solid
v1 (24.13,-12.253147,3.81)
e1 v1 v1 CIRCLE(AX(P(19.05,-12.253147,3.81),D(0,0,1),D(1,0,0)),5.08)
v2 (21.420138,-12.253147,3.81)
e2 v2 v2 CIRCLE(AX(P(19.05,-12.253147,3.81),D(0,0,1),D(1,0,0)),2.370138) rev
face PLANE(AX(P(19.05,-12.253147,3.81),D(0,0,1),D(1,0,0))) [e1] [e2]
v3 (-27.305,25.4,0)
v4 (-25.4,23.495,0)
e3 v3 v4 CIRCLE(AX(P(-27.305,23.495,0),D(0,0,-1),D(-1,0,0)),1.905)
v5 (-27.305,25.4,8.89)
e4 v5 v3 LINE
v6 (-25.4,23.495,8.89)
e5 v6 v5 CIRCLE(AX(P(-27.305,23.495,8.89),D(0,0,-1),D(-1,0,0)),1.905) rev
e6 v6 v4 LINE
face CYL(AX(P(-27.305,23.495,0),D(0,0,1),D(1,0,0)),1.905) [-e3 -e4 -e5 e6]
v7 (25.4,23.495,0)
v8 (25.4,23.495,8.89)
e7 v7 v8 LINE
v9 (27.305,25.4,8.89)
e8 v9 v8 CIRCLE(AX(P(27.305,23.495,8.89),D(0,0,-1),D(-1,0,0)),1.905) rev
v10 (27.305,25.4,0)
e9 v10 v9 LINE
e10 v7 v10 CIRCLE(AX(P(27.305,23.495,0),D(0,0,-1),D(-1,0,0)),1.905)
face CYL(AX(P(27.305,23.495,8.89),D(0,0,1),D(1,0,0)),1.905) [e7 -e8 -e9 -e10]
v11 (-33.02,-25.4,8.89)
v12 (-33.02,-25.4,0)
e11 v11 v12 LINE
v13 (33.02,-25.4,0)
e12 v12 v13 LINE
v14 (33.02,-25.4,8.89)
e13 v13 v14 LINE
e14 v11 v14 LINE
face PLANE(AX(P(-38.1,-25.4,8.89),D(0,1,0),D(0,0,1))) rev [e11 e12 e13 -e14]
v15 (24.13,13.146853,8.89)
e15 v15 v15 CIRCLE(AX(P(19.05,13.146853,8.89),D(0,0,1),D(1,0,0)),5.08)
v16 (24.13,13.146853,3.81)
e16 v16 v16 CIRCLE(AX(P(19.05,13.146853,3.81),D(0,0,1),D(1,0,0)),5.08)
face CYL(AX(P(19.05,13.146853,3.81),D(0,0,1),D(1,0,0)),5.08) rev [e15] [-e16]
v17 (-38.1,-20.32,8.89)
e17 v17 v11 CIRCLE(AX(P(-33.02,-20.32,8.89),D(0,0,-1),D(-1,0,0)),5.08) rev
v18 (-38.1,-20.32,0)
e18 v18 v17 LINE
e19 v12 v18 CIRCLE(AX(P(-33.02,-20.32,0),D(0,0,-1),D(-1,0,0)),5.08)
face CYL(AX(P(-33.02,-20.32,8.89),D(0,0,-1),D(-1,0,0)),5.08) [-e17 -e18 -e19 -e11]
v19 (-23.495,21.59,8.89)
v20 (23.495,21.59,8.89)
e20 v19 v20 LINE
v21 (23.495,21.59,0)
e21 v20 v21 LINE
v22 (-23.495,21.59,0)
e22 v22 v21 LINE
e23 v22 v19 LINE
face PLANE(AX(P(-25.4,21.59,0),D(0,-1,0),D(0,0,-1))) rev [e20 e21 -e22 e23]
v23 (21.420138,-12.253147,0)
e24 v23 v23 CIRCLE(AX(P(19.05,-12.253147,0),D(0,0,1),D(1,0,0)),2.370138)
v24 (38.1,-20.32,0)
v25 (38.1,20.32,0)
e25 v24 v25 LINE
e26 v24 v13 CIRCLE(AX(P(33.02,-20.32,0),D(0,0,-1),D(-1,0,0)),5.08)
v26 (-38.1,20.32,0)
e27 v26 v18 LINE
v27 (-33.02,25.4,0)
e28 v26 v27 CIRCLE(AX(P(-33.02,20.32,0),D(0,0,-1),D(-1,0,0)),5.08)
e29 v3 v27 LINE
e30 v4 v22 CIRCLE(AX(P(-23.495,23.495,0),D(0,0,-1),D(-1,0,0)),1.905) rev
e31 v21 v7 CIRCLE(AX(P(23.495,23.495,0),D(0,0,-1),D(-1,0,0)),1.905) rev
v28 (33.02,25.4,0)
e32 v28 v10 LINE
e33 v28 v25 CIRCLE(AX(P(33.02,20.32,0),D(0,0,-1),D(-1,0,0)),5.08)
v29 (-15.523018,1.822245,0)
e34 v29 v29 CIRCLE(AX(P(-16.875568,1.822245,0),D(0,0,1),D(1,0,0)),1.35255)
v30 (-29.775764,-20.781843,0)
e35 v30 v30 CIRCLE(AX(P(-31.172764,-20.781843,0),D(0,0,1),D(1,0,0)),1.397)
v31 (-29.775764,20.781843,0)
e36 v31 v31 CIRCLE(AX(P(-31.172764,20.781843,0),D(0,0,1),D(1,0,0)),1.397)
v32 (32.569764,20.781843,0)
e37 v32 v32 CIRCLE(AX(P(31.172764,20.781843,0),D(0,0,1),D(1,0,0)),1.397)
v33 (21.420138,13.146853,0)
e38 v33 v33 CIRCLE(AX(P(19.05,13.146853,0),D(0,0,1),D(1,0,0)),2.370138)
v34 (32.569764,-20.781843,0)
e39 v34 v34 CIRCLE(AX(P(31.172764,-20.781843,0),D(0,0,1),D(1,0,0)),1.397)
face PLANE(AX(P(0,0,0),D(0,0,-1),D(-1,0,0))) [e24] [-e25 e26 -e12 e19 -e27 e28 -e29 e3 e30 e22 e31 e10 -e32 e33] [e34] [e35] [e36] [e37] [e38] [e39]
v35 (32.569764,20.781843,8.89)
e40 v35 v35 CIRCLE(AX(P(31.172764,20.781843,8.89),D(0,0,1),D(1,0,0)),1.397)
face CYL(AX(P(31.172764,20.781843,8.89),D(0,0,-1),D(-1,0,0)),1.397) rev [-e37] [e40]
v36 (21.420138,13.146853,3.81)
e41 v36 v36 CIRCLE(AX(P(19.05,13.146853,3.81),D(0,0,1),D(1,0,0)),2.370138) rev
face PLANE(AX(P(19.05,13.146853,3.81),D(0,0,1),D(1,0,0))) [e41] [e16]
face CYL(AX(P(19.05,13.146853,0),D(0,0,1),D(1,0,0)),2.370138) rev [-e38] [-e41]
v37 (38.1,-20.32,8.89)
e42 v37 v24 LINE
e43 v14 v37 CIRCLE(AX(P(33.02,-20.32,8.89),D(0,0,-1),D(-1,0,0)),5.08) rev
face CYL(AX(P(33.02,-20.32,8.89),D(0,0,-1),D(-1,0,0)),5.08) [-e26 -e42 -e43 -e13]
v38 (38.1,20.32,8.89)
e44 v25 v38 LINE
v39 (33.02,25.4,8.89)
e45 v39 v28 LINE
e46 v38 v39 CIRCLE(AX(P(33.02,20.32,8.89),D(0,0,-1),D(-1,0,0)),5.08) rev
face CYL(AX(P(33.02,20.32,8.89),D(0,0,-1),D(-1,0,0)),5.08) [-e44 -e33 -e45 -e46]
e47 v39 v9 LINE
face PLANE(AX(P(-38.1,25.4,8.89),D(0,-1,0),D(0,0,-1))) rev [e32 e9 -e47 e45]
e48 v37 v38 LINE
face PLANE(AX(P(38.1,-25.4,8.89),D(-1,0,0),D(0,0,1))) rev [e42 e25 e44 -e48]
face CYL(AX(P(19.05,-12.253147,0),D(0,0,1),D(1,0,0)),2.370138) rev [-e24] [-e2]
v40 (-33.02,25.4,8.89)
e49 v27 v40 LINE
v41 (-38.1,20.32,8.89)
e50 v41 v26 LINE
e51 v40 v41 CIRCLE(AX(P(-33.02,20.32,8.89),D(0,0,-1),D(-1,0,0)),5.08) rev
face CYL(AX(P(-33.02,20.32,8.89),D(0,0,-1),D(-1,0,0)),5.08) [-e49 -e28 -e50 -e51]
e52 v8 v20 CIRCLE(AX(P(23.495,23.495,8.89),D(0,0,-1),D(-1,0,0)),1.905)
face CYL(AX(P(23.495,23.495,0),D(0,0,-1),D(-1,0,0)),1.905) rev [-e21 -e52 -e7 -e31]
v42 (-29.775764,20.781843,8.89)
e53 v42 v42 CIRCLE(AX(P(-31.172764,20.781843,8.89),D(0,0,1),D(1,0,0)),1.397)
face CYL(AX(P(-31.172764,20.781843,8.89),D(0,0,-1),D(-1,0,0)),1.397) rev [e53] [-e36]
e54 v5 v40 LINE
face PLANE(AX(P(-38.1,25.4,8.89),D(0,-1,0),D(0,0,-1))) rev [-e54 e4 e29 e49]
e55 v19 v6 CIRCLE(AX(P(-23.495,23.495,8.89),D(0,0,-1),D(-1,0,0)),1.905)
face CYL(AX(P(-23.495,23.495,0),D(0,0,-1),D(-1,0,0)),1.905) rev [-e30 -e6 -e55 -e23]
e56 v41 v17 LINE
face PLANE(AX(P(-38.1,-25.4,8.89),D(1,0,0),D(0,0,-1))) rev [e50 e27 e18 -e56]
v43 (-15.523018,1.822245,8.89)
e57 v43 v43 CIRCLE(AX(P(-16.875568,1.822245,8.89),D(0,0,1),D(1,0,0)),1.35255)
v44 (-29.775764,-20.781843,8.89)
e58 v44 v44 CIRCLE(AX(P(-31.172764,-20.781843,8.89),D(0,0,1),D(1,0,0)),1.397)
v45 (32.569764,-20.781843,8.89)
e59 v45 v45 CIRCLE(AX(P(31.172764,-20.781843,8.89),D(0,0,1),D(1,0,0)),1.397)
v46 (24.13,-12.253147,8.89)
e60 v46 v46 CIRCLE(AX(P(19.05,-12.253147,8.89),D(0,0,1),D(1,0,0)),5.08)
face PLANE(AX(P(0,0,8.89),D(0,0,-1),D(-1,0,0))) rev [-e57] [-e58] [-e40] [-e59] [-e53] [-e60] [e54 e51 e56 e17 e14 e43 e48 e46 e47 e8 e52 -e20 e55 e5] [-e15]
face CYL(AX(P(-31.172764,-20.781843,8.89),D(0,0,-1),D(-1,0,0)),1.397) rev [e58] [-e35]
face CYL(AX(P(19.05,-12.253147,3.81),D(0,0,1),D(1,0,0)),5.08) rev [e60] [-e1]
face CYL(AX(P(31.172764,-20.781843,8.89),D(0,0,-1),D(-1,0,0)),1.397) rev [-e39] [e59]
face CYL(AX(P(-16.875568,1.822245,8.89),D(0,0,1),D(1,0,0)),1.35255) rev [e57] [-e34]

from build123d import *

# Parameters (mm, degrees)
SKETCH1_W             = 76.2
SKETCH1_H             = 50.8
SKETCH1_R             = 1.397
BOSS_EXTRUDE1_DEPTH   = 8.89
FILLET1_R             = 5.08
SKETCH2_R             = 2.370137615
CUT_EXTRUDE1_DEPTH    = 47.645493887
SKETCH3_R             = 5.08
CUT_EXTRUDE2_DEPTH    = 5.08
SKETCH4_W             = 50.8
SKETCH4_H             = 3.81
CUT_EXTRUDE3_DEPTH    = 47.645493887
FILLET2_R             = 1.905
F_6_32_TAPPED_HOLE1_D = 2.7051


with BuildPart() as part:
    # Sketch1 → Boss-Extrude1 (new body)
    with BuildSketch(Plane.XY):
        Rectangle(SKETCH1_W, SKETCH1_H)
        with Locations((-31.172764277, -20.781842852)):
            Circle(SKETCH1_R, mode=Mode.SUBTRACT)
        with Locations((31.172764277, 20.781842852)):
            Circle(SKETCH1_R, mode=Mode.SUBTRACT)
        with Locations((-31.172764277, 20.781842852)):
            Circle(SKETCH1_R, mode=Mode.SUBTRACT)
        with Locations((31.172764277, -20.781842852)):
            Circle(SKETCH1_R, mode=Mode.SUBTRACT)
    extrude(amount=BOSS_EXTRUDE1_DEPTH)

    # Fillet1
    fillet1_edges = [part.edges().sort_by_distance(p)[0] for p in [
        (38.1, -25.4, 4.445),
        (-38.1, -25.4, 4.445),
        (-38.1, 25.4, 4.445),
        (38.1, 25.4, 4.445),
    ]]
    fillet(fillet1_edges, radius=FILLET1_R)

    # Sketch2 → Cut-Extrude1 (cut, through all)
    with BuildSketch(Plane.XY.offset(8.89)):
        with Locations((19.05, 13.146852544)):
            Circle(SKETCH2_R)
        with Locations((19.05, -12.253147456)):
            Circle(SKETCH2_R)
    extrude(amount=-CUT_EXTRUDE1_DEPTH, mode=Mode.SUBTRACT)

    # Sketch3 → Cut-Extrude2 (cut)
    with BuildSketch(Plane.XY.offset(8.89)):
        with Locations((19.05, 13.146852544)):
            Circle(SKETCH3_R)
        with Locations((19.05, -12.253147456)):
            Circle(SKETCH3_R)
    extrude(amount=-CUT_EXTRUDE2_DEPTH, mode=Mode.SUBTRACT)

    # Sketch4 → Cut-Extrude3 (cut, through all)
    with BuildSketch(Plane.XY.offset(8.89)):
        with Locations((0, 23.495)):
            Rectangle(SKETCH4_W, SKETCH4_H)
    extrude(amount=-CUT_EXTRUDE3_DEPTH, mode=Mode.SUBTRACT)

    # Fillet2
    fillet2_edges = [part.edges().sort_by_distance(p)[0] for p in [
        (25.4, 21.59, 4.445),
        (-25.4, 21.59, 4.445),
    ]]
    fillet(fillet2_edges, radius=FILLET2_R)
    fillet2_2_edges = [part.edges().sort_by_distance(p)[0] for p in [
        (25.4, 25.4, 4.445),
        (-25.4, 25.4, 4.445),
    ]]
    fillet(fillet2_2_edges, radius=FILLET2_R - 0.0001)  # a hair under: the kernel refuses the full size

    # #6-32 Tapped Hole1 (through all)
    with Locations(Plane.XY.offset(8.89)):
        with Locations((-16.875568399, 1.822244587)):
            Hole(F_6_32_TAPPED_HOLE1_D / 2)


solid = part.part
